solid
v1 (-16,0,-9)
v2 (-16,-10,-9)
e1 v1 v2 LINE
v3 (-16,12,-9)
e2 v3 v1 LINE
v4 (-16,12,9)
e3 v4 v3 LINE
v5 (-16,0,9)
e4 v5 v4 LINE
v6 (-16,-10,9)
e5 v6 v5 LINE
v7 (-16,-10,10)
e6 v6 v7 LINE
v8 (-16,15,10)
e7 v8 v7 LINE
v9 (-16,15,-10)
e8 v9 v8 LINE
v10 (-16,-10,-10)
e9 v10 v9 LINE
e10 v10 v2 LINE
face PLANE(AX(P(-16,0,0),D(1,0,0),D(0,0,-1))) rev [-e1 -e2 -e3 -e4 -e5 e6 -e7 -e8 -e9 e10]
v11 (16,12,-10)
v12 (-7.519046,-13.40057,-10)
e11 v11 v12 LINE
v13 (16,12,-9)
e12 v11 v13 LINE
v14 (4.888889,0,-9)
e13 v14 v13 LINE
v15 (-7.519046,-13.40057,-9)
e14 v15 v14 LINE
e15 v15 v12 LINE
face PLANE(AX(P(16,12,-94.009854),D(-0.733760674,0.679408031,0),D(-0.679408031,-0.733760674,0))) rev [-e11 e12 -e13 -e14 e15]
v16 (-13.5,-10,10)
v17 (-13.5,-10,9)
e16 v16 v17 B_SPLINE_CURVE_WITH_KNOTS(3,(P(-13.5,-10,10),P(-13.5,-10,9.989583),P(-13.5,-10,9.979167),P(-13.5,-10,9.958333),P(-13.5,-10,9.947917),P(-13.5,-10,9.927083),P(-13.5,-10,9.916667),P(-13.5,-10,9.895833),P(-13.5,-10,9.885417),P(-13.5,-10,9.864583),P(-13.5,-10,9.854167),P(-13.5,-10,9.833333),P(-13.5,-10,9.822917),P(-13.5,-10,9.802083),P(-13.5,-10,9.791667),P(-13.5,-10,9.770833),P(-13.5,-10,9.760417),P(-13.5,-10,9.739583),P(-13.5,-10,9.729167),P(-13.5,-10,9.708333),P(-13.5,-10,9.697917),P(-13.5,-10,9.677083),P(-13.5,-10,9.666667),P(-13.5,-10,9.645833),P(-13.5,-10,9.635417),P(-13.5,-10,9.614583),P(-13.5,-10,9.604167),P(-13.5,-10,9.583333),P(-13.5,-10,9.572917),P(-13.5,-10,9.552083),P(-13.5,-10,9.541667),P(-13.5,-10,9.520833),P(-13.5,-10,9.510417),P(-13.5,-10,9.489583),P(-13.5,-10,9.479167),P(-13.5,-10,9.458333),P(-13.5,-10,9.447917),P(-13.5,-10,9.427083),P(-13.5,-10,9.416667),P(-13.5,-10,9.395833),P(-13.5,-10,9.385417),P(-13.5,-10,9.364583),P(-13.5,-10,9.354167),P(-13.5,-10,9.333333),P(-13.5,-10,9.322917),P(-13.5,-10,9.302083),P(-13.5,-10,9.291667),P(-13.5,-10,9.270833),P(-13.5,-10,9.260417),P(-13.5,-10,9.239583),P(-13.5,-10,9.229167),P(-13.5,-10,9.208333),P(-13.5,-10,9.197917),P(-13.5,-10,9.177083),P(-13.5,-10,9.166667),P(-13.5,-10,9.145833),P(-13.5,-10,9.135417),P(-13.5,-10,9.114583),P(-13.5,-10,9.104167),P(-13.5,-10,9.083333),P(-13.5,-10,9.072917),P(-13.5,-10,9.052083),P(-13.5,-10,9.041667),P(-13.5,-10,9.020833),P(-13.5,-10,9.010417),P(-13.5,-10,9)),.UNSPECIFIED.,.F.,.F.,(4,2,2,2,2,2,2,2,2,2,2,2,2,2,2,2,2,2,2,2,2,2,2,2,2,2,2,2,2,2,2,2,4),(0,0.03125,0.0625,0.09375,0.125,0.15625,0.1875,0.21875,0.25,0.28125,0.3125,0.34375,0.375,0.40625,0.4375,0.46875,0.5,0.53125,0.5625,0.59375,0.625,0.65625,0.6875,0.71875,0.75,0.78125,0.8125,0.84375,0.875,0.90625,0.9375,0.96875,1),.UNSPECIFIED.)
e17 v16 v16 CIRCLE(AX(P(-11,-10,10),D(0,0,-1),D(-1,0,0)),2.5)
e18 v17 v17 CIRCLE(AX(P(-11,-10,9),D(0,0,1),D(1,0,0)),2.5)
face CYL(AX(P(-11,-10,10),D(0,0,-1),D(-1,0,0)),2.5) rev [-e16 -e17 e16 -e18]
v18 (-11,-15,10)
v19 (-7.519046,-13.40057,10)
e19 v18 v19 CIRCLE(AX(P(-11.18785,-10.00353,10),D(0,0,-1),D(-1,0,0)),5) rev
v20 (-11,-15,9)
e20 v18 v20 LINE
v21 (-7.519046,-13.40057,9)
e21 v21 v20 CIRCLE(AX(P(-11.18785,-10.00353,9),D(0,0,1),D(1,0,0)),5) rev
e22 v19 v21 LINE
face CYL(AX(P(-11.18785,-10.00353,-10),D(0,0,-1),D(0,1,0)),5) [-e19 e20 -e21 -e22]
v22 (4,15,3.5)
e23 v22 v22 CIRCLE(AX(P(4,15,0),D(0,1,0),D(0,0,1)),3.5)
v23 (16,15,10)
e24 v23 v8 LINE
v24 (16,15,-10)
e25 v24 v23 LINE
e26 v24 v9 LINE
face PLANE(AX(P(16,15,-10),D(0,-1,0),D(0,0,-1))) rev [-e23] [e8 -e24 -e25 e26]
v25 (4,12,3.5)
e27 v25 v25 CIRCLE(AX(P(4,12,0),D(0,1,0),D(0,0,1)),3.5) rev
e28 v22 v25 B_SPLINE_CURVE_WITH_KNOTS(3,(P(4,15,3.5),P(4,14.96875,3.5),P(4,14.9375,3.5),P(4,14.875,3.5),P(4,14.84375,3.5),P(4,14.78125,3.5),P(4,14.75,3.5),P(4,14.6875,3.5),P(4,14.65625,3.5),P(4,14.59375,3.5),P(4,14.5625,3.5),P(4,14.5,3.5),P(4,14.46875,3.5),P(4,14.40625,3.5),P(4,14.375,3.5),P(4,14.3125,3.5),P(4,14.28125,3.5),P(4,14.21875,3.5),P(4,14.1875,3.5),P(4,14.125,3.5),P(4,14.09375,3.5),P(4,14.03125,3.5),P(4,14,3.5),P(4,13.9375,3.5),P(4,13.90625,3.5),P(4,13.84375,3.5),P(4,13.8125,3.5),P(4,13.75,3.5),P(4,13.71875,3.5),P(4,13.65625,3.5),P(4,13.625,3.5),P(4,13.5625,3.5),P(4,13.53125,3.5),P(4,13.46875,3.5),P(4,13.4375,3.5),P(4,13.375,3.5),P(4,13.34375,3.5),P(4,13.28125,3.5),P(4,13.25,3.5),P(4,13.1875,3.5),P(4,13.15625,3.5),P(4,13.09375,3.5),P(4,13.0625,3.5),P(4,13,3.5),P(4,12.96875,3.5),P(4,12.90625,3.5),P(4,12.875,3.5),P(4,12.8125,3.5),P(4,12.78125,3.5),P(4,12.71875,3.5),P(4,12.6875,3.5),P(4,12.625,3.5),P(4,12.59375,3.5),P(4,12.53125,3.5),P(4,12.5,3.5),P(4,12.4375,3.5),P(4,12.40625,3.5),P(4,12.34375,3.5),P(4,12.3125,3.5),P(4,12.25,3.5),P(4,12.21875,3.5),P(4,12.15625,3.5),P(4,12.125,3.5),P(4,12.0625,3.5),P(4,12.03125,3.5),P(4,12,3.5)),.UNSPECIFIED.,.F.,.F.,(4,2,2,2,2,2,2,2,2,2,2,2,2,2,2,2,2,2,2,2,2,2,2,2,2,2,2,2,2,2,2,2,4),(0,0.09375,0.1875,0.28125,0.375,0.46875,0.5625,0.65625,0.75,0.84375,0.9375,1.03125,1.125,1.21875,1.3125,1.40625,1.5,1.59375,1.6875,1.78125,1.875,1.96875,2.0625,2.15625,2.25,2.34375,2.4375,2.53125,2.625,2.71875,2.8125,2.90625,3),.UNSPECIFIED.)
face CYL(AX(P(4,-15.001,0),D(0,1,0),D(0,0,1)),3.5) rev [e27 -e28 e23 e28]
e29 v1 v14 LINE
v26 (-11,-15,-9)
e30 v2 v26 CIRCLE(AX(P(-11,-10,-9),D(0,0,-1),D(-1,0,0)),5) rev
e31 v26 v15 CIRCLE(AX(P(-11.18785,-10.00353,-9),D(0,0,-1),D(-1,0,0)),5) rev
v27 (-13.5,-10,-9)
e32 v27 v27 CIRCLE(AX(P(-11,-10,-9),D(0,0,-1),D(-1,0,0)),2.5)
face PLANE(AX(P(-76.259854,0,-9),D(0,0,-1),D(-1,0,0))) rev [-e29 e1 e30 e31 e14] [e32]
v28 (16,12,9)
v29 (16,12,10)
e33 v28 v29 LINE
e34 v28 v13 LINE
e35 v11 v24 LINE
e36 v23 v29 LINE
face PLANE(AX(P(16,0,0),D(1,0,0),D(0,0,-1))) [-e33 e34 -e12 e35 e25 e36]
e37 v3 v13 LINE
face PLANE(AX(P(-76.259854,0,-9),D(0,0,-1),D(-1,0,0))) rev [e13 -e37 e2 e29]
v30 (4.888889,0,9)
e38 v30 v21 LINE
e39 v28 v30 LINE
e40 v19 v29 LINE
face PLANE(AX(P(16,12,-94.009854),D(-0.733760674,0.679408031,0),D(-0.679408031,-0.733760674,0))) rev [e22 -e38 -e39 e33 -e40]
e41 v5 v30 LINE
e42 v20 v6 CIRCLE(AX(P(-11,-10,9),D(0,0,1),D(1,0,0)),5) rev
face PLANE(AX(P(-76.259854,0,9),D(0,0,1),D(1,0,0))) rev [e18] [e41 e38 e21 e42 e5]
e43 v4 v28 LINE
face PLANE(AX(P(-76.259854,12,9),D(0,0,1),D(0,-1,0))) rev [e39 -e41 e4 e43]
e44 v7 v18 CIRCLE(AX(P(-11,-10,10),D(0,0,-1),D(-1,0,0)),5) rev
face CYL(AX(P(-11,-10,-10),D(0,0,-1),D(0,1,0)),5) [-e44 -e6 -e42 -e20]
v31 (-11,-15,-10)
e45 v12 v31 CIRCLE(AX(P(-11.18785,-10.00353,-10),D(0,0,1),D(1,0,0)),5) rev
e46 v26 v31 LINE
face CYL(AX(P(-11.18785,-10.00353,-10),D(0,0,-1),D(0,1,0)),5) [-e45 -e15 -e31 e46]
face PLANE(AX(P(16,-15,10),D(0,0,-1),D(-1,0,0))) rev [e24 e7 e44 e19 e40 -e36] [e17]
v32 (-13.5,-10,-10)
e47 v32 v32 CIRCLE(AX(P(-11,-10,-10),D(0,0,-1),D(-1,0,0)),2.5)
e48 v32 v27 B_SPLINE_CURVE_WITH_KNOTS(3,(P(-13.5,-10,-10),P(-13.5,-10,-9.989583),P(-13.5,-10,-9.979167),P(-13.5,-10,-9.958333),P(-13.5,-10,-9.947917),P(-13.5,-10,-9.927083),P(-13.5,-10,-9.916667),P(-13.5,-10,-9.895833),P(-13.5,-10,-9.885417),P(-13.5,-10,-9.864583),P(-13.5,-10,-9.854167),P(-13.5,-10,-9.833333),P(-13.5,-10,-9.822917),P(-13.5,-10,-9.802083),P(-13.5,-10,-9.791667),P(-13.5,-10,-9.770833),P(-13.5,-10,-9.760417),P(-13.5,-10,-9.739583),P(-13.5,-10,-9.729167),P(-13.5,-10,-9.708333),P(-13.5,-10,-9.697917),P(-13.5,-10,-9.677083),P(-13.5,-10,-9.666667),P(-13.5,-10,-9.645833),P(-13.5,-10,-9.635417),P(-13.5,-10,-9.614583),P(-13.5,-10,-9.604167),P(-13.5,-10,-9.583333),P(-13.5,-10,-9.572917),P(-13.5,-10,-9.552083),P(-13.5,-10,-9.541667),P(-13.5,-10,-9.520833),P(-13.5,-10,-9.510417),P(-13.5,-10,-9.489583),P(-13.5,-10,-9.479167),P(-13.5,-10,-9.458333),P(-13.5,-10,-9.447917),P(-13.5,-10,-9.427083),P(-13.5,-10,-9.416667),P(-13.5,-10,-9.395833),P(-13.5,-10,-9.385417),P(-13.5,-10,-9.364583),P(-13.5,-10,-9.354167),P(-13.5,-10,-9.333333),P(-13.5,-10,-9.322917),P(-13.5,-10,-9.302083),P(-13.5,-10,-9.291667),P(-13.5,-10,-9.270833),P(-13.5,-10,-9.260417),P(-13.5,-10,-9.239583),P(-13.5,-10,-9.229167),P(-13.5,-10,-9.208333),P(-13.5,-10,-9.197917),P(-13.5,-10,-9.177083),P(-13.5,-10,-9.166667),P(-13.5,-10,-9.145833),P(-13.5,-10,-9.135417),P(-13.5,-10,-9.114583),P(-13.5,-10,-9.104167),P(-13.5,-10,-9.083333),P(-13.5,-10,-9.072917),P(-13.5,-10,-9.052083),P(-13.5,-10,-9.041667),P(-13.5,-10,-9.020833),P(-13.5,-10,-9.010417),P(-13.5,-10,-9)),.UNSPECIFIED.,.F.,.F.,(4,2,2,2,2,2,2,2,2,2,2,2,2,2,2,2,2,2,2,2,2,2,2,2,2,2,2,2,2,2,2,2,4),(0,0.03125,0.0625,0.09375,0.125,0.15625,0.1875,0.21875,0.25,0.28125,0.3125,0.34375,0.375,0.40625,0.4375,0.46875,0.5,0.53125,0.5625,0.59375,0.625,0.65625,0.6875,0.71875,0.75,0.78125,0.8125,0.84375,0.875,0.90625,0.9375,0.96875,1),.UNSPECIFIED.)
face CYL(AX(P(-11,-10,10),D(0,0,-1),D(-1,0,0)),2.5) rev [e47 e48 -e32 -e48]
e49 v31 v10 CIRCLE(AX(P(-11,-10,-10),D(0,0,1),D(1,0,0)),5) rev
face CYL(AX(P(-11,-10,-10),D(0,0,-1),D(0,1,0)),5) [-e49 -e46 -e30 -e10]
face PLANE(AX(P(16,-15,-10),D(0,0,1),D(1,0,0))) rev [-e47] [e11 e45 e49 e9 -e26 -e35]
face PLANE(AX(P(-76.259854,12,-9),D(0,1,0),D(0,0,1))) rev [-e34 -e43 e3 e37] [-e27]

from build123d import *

# Parameters (mm, degrees)
SKETCH4_W               = 20
SKETCH4_H               = 30
BOSS_EXTRUDE2_DEPTH     = 16
CUT_EXTRUDE2_DEPTH      = 37.728735344
CUT_EXTRUDE2_DEPTH_BACK = 32
CUT_EXTRUDE4_DEPTH      = 30.681644159
CUT_EXTRUDE4_DEPTH_BACK = 30.681644159
SKETCH7_R               = 2.5
CUT_EXTRUDE5_DEPTH      = 30.681644159
FILLET2_R               = 5
FILLET3_R               = 5
FILLET4_R               = 5
FILLET5_R               = 5
CUT_EXTRUDE6_REACH      = 37.44
SKETCH8_R               = 3.5


with BuildPart() as part:
    # Sketch4 → Boss-Extrude2 (new, symmetric)
    with BuildSketch(Plane(origin=(0, 0, 0), x_dir=(0, 0, -1), z_dir=(1, 0, 0))):
        Rectangle(SKETCH4_W, SKETCH4_H)
    extrude(amount=BOSS_EXTRUDE2_DEPTH, both=True)

    # Sketch5 → Cut-Extrude2 (cut, two sides: drawn at the far end of the back side and taken through both)
    with BuildSketch(Plane.ZY.offset(16).offset(-CUT_EXTRUDE2_DEPTH_BACK)):
        Polygon((-9, -96.021123618), (-9, -15), (-9, 0), (-9, 12), (9, 12), (9, 0), (9, -15), (9, -96.021123618), (9, -258.063370855), (-9, -258.063370855), align=None)
    extrude(amount=CUT_EXTRUDE2_DEPTH + CUT_EXTRUDE2_DEPTH_BACK, mode=Mode.SUBTRACT)

    # Sketch6 → Cut-Extrude4 (cut, two sides: drawn at the far end of the back side and taken through both)
    with BuildSketch(Plane(origin=(0, 0, -10), x_dir=(-1, 0, 0), z_dir=(0, 0, -1)).offset(-CUT_EXTRUDE4_DEPTH_BACK)):
        Polygon((-79.686136493, 80.781027412), (-16, 12), (9, -15), (72.686136493, -83.781027412), (-64.875918332, -211.153300398), (-217.248191317, -46.591245573), align=None)
    extrude(amount=CUT_EXTRUDE4_DEPTH + CUT_EXTRUDE4_DEPTH_BACK, mode=Mode.SUBTRACT)

    # Sketch7 → Cut-Extrude5 (cut, through all)
    with BuildSketch(Plane(origin=(0, 0, -10), x_dir=(-1, 0, 0), z_dir=(0, 0, -1))):
        with Locations((11, -10)):
            Circle(SKETCH7_R)
    extrude(amount=-CUT_EXTRUDE5_DEPTH, mode=Mode.SUBTRACT)

    # Fillet2
    fillet2_edges = [part.edges().sort_by_distance(p)[0] for p in [
        (-16, -15, -9.5),
    ]]
    fillet(fillet2_edges, radius=FILLET2_R)

    # Fillet3
    # the kernel refuses this fillet: 5 mm, written as the material it takes off along each edge
    with BuildSketch(Plane(origin=(-9, -15, -15.449426147), x_dir=(-1, 0, 0), z_dir=(0, 0, 1))) as fillet3_piece_1:
        with BuildLine():
            CenterArc((2.187849813, -4.996469999), FILLET3_R, 92.15310702, 45.049491141)
            Line((-1.480953557, -1.599429841), (-1.554329624, -1.531489038))
            Line((-1.554329624, -1.531489038), (-0.073376067, 0.067940803))
            Line((-0.073376067, 0.067940803), (0, 0.1))
            ThreePointArc((0, 0.1), (1, 0.1), (1.996243004, 0.0999294))
            Line((1.996243004, 0.0999294), (2, 0))
        make_face()
    extrude(amount=11.898852295, mode=Mode.SUBTRACT)

    # Fillet4
    fillet4_edges = [part.edges().sort_by_distance(p)[0] for p in [
        (-16, -15, 9.5),
    ]]
    fillet(fillet4_edges, radius=FILLET4_R)

    # Fillet5
    # the kernel refuses this fillet: 5 mm, written as the material it takes off along each edge
    with BuildSketch(Plane(origin=(-9, -15, 3.550573853), x_dir=(-1, 0, 0), z_dir=(0, 0, 1))) as fillet5_piece_1:
        with BuildLine():
            CenterArc((2.187849813, -4.996469999), FILLET5_R, 92.15310702, 45.049491141)
            Line((-1.480953557, -1.599429841), (-1.554329624, -1.531489038))
            Line((-1.554329624, -1.531489038), (-0.073376067, 0.067940803))
            Line((-0.073376067, 0.067940803), (0, 0.1))
            ThreePointArc((0, 0.1), (1, 0.1), (1.996243004, 0.0999294))
            Line((1.996243004, 0.0999294), (2, 0))
        make_face()
    extrude(amount=11.898852295, mode=Mode.SUBTRACT)

    # Sketch8 → Cut-Extrude6 (cut, up to next)
    with BuildSketch(Plane(origin=(0, 15, 0), x_dir=(1, 0, 0), z_dir=(0, 1, 0)), mode=Mode.PRIVATE) as cut_extrude6_sk1:
        with Locations(Location((4, 0, 0), (0, 0, 270))):
            Circle(SKETCH8_R)
    cut_extrude6_tool1 = extrude(cut_extrude6_sk1.sketch, amount=-CUT_EXTRUDE6_REACH, mode=Mode.PRIVATE) & part.part
    add(cut_extrude6_tool1.solids().sort_by_distance((4, 15, 0))[0], mode=Mode.SUBTRACT)


solid = part.part
